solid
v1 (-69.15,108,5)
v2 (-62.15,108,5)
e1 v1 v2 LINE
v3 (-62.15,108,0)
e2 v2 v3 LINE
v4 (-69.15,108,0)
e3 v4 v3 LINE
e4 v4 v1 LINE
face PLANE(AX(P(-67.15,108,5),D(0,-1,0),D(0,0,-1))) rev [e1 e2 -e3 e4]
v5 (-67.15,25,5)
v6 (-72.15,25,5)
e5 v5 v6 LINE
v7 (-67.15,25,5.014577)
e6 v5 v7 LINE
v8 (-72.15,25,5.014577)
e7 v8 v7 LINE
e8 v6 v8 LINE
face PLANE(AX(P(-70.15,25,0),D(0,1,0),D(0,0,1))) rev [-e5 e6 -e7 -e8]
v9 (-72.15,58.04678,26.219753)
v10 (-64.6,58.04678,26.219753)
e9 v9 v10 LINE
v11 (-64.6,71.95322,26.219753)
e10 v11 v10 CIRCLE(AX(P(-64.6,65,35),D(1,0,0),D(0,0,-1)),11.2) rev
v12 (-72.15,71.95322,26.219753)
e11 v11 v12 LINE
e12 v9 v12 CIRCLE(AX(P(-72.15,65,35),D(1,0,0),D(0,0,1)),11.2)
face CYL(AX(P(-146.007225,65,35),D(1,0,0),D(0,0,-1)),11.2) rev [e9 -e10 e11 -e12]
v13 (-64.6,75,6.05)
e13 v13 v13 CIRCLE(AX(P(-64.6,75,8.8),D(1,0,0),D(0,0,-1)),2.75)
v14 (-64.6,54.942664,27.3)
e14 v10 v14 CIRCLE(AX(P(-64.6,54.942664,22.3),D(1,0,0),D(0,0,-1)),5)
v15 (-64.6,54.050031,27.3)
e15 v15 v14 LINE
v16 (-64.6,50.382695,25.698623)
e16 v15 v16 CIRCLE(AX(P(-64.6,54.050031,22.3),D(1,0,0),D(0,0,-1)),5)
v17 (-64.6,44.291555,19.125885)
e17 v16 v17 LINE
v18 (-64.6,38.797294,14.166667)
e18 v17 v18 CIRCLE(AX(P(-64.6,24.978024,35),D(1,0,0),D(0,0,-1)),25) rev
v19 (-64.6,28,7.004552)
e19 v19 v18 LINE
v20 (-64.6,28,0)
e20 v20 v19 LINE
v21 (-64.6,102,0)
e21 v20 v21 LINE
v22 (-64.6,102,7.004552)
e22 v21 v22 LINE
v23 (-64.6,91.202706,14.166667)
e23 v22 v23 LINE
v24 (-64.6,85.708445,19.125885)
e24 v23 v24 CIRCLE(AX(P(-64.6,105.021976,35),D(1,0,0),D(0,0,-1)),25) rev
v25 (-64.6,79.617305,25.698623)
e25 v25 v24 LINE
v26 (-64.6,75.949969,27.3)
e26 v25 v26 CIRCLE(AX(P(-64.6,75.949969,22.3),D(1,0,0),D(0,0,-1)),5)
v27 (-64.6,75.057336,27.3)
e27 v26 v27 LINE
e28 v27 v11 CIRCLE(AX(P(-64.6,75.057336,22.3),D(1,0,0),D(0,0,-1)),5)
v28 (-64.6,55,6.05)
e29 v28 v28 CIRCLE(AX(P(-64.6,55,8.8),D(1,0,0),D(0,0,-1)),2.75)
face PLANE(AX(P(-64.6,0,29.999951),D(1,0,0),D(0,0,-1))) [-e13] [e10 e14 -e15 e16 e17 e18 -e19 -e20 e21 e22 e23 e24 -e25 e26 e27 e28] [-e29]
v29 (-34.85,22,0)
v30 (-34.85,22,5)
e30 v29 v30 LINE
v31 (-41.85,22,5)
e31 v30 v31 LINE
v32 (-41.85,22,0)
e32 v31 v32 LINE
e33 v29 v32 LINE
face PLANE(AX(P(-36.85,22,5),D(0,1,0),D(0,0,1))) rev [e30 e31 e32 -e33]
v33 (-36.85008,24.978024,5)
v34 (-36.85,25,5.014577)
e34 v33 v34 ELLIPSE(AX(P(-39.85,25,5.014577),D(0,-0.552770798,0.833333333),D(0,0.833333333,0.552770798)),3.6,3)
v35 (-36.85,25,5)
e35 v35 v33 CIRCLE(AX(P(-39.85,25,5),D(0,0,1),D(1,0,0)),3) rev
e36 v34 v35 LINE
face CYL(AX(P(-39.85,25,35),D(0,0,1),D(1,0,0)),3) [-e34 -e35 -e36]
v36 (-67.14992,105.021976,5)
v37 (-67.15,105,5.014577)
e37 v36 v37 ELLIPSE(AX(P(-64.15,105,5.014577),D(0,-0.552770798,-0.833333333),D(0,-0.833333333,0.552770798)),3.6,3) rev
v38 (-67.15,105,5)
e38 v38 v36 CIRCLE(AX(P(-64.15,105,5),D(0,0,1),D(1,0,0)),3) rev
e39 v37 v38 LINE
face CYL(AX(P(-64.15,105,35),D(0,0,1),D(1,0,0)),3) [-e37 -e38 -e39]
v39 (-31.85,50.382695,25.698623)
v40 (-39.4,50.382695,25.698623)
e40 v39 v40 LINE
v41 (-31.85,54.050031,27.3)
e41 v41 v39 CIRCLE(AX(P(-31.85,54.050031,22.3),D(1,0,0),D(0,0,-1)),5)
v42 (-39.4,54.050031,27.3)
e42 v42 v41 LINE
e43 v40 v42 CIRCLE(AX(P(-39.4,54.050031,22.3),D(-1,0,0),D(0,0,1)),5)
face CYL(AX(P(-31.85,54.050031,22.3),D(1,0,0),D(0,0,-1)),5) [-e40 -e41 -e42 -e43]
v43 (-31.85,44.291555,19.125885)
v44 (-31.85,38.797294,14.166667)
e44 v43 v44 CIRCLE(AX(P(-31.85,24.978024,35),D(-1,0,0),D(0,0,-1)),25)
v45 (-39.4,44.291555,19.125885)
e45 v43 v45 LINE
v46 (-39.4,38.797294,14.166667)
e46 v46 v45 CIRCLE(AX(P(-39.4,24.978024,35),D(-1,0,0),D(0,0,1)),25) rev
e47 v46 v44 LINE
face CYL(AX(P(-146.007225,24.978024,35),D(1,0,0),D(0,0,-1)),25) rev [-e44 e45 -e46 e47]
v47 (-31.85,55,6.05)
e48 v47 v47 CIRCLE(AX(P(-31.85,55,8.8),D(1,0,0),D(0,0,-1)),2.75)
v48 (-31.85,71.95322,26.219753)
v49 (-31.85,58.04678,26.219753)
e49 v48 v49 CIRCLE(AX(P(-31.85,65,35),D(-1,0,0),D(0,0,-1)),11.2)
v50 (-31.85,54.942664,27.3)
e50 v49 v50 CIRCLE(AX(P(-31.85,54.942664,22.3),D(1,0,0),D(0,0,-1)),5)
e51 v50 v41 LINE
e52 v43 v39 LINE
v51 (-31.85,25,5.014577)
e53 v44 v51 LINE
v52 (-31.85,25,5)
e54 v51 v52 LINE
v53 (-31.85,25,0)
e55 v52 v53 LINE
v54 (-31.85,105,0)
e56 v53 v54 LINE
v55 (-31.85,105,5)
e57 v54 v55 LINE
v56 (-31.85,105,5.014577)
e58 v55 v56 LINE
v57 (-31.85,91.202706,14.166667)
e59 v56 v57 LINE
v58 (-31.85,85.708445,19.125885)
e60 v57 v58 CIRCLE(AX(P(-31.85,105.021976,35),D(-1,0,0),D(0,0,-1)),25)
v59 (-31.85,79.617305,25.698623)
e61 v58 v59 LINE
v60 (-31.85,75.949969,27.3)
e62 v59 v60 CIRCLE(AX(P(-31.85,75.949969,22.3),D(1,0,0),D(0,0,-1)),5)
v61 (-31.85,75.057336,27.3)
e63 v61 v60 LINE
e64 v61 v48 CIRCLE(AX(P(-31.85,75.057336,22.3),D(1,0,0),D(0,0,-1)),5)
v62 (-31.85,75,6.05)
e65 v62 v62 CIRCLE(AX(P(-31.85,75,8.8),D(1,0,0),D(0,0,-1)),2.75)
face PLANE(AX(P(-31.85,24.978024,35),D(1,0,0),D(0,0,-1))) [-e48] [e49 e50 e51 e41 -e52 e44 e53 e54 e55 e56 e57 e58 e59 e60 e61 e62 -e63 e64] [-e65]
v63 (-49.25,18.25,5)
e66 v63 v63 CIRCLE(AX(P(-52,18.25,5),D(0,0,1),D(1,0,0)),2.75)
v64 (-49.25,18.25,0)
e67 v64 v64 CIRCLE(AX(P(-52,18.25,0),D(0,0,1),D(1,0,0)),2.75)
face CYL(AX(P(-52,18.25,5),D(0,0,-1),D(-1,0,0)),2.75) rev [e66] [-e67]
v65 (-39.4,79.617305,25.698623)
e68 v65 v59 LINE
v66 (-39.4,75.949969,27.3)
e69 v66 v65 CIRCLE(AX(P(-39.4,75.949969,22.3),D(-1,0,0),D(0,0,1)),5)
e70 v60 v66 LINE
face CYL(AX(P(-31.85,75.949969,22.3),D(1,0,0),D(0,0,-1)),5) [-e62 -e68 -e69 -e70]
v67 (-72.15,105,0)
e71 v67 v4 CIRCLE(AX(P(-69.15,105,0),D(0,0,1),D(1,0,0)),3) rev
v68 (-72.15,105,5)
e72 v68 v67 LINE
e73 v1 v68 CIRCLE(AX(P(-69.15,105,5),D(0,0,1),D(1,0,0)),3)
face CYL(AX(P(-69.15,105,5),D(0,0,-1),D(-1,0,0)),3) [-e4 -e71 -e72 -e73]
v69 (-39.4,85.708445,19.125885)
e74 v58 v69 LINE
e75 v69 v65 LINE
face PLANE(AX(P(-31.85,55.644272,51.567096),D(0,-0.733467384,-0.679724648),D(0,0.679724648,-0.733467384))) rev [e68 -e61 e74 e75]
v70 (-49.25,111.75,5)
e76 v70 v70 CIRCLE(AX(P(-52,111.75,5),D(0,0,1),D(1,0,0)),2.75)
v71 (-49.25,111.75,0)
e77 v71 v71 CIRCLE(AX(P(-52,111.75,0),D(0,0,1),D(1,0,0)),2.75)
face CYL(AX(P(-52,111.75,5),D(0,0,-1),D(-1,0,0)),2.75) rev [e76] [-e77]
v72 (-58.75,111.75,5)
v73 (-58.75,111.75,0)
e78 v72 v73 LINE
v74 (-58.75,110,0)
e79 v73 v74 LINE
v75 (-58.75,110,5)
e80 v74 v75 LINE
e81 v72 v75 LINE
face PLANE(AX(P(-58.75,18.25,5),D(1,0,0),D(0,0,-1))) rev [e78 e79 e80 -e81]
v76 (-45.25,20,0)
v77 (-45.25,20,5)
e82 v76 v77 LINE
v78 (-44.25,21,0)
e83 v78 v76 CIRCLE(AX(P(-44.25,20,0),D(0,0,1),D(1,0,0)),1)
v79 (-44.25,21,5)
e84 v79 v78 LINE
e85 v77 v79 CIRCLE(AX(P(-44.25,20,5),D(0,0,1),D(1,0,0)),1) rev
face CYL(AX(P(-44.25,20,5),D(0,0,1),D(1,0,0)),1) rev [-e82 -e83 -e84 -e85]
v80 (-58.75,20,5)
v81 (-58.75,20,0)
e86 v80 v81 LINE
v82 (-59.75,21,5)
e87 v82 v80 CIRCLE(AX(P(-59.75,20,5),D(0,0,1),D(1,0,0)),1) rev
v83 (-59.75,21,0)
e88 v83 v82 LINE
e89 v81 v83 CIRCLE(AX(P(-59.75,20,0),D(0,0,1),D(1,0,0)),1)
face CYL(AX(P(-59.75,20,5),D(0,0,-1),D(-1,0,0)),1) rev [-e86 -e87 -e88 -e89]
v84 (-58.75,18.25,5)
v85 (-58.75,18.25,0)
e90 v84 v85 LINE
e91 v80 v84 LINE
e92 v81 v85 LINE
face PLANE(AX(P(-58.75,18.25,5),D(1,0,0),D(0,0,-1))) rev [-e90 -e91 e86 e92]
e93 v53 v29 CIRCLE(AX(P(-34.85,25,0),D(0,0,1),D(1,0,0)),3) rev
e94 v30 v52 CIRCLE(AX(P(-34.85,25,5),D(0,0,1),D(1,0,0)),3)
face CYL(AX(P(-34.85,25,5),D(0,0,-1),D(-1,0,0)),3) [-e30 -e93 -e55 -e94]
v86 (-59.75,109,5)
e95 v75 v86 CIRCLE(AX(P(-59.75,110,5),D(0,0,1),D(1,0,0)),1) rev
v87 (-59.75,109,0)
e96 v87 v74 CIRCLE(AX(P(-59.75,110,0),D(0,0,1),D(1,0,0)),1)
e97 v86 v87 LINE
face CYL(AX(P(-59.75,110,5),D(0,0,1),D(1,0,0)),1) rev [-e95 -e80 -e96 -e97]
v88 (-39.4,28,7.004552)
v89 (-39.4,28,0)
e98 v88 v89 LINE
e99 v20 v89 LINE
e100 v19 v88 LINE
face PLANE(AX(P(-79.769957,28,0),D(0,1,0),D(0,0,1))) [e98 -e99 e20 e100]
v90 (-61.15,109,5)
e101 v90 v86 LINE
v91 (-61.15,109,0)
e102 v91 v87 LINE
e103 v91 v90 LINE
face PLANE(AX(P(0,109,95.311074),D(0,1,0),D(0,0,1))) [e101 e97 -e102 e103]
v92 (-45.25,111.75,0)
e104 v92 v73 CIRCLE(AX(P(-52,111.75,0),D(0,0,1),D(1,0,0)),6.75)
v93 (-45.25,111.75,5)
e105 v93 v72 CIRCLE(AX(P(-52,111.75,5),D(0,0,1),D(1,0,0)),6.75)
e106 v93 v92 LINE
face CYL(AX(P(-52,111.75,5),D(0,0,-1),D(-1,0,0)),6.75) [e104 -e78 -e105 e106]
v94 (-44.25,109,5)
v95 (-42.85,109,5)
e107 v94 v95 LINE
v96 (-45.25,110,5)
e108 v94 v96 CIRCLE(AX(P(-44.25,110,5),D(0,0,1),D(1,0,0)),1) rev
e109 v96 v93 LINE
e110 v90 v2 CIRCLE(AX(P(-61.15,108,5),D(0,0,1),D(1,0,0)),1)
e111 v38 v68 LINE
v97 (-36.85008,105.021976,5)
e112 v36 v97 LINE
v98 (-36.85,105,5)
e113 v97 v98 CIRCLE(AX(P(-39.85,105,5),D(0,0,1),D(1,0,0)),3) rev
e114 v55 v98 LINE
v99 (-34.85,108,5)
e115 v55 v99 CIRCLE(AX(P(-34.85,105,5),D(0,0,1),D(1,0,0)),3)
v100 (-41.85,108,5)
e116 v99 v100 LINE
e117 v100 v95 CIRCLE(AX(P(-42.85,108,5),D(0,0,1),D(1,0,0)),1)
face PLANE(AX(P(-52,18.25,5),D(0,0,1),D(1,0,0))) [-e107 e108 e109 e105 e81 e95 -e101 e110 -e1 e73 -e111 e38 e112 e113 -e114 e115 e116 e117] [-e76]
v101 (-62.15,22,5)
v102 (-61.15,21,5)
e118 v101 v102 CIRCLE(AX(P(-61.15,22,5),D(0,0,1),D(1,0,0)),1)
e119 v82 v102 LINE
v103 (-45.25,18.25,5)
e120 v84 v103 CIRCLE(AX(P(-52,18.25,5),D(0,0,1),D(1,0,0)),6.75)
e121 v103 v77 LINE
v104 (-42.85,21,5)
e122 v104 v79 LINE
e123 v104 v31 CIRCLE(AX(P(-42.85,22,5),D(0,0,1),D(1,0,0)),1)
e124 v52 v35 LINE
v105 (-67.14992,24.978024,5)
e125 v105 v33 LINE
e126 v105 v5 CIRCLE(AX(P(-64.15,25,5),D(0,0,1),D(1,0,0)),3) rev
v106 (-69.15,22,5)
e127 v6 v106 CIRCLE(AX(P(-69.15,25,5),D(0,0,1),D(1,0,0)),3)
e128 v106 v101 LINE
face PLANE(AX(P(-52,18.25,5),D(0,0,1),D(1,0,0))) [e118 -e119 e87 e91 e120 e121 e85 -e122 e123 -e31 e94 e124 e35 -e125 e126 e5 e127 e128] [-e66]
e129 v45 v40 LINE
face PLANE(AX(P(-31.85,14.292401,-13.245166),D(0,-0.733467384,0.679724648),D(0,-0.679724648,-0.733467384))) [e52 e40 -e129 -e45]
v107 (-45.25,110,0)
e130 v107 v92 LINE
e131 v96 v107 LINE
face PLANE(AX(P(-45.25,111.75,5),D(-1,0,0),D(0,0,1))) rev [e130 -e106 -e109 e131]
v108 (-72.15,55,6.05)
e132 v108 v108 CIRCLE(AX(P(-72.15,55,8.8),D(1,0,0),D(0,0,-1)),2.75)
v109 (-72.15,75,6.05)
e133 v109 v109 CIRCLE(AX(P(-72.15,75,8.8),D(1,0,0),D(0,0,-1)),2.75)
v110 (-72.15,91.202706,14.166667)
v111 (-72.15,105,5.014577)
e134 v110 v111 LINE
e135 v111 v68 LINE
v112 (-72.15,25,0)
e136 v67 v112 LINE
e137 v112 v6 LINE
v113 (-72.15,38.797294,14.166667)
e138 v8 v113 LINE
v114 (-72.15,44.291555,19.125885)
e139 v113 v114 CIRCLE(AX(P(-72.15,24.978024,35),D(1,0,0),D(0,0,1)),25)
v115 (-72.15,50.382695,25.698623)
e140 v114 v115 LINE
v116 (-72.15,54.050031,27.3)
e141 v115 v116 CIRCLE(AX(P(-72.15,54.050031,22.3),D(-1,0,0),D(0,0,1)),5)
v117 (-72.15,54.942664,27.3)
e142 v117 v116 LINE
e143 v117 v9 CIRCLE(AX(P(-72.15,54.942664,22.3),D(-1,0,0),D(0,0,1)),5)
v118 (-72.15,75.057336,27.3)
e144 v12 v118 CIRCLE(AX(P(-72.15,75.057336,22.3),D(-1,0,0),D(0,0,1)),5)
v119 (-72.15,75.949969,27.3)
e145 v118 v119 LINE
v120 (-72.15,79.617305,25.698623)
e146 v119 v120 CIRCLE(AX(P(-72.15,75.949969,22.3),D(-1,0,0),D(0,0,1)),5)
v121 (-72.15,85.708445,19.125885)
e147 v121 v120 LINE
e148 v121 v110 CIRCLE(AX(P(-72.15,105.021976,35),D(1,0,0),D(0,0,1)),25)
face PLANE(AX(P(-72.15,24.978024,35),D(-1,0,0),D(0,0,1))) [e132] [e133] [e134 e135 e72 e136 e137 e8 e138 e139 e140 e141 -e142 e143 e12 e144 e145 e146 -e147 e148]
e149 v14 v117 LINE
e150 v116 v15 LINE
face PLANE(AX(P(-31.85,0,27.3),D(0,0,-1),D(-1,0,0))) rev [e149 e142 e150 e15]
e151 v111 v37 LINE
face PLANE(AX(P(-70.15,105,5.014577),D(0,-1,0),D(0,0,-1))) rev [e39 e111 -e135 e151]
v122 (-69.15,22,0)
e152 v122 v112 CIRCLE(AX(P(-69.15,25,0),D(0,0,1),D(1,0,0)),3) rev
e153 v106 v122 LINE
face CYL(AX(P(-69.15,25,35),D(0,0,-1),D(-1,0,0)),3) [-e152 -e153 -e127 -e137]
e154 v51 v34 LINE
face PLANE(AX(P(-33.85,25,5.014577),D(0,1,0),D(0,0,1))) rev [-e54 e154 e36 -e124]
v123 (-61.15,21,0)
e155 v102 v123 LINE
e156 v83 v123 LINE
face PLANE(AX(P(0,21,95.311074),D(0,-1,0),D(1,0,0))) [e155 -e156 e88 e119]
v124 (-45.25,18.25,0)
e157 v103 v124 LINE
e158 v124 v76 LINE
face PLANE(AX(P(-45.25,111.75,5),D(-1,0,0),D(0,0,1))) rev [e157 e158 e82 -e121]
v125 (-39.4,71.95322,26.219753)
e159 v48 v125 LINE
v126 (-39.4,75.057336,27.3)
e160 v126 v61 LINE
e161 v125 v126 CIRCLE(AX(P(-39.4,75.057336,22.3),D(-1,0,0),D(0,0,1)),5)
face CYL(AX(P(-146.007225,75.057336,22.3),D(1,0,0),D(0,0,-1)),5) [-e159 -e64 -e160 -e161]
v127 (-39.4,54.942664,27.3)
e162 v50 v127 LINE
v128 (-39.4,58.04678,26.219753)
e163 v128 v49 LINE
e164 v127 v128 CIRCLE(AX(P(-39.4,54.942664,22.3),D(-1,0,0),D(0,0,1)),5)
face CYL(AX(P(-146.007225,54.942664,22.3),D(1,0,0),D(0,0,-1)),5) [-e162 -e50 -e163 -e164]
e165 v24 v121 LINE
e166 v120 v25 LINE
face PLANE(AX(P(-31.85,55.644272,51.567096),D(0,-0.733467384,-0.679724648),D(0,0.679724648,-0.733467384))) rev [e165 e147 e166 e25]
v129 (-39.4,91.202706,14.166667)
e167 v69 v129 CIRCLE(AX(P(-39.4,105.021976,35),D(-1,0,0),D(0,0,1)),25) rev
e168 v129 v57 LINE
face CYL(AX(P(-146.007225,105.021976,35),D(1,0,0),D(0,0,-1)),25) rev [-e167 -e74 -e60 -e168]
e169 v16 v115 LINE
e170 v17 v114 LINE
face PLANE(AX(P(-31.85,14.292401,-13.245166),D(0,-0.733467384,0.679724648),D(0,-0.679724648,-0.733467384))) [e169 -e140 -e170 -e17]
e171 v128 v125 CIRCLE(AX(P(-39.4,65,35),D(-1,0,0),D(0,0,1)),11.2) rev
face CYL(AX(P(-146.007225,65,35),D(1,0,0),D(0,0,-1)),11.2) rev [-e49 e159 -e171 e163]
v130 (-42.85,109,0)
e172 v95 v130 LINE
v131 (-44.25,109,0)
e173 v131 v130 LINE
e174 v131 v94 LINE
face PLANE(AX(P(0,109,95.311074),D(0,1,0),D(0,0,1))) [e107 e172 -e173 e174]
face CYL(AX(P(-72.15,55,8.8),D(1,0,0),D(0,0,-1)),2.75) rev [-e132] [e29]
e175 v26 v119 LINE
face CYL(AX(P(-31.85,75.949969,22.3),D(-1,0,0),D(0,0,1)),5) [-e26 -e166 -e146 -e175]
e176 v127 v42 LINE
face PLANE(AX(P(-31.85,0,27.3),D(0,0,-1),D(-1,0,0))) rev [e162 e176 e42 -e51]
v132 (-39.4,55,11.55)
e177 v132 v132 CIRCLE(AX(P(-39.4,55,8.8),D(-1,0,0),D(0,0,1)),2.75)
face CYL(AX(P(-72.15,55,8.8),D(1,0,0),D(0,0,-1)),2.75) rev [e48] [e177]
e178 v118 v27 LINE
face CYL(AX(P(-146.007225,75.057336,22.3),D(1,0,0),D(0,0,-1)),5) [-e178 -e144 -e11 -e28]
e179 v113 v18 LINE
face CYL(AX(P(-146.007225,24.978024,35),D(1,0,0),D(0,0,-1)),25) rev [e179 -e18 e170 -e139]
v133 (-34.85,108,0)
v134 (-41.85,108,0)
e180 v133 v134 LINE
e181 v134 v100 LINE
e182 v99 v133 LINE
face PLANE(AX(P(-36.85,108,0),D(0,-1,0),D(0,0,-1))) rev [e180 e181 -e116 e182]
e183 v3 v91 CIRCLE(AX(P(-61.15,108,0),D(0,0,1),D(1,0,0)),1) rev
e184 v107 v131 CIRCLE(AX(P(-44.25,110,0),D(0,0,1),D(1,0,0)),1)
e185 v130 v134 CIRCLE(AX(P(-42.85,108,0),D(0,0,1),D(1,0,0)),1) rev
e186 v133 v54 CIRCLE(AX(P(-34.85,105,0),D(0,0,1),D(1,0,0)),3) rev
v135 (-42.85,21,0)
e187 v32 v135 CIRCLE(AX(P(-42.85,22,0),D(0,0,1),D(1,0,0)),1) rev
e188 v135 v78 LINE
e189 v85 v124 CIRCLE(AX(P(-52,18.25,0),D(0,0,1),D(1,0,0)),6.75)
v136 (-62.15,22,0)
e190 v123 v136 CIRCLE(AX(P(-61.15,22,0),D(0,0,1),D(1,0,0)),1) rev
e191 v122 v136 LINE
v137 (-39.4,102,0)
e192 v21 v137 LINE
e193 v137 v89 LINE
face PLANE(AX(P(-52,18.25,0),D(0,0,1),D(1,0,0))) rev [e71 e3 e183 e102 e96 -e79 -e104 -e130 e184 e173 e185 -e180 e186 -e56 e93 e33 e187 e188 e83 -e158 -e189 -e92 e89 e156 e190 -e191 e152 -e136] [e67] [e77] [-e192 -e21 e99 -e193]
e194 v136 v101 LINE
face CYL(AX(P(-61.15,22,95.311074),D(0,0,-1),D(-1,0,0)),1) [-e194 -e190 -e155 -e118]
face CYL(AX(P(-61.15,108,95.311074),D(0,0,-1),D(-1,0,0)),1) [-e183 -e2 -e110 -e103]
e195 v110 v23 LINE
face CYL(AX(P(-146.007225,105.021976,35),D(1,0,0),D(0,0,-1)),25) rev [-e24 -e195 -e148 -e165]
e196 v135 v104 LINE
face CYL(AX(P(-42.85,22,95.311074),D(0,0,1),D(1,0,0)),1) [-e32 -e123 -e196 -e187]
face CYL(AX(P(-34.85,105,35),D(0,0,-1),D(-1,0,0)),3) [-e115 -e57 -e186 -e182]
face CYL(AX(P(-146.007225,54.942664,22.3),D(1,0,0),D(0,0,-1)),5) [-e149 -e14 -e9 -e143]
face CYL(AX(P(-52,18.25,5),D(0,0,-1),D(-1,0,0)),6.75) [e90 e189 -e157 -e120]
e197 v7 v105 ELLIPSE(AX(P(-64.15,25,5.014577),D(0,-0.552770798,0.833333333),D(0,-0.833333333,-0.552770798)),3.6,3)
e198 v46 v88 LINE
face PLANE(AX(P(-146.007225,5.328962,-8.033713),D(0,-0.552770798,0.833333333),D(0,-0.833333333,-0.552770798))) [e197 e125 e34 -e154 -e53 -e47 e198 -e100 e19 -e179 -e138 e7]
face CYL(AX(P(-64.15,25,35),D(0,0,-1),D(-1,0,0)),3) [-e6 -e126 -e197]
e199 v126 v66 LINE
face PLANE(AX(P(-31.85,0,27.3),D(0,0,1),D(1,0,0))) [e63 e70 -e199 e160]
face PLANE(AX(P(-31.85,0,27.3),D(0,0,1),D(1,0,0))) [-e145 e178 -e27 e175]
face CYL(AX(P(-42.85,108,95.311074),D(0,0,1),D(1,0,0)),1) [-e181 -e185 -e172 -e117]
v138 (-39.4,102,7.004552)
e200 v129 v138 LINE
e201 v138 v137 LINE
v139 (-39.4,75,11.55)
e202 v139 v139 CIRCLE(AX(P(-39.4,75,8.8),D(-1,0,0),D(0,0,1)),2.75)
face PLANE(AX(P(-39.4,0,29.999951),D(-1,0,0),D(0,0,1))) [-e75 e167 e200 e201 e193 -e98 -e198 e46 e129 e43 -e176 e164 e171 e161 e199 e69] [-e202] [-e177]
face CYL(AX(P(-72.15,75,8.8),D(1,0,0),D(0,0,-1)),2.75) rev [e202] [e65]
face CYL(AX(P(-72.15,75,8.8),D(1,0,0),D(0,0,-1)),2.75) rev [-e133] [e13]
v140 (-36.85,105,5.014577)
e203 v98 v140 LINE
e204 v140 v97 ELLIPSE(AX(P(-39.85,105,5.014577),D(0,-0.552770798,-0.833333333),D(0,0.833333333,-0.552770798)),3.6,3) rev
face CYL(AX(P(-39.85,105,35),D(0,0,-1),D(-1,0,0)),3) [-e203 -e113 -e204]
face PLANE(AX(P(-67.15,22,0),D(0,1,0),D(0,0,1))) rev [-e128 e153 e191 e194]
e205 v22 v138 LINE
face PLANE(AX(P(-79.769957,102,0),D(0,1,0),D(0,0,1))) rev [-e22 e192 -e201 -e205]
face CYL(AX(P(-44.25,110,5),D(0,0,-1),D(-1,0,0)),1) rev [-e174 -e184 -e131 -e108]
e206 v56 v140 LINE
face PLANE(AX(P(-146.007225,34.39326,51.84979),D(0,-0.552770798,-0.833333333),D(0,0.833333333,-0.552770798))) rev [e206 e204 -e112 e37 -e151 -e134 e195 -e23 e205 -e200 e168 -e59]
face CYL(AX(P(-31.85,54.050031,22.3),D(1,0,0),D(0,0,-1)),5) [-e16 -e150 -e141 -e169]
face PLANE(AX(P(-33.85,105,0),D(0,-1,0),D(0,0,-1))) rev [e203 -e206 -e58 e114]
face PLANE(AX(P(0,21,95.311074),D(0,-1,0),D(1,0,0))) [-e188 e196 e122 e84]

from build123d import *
from build123d.topology import SkipClean

# Parameters (mm, degrees)
SKETCH2_R               = 2.75
SKETCH2_W               = 8.45
SKETCH2_H               = 80
BOSS_EXTRUDE1_DEPTH     = 5
SKETCH4_W               = 3.4
SKETCH4_H               = 88
BOSS_EXTRUDE2_DEPTH     = 5
BOSS_EXTRUDE3_DEPTH     = 20.3
FILLET3_R               = 4.2
SKETCH7_W               = 8.45
SKETCH7_H               = 80
CUT_EXTRUDE1_DEPTH      = 38
FILLET4_R               = 3
FILLET5_R               = 1
BOSS_EXTRUDE4_START     = 5
BOSS_EXTRUDE4_DEPTH     = 5
BOSS_EXTRUDE5_DEPTH     = 5
CUT_EXTRUDE2_START      = -5
CUT_EXTRUDE2_DEPTH      = 5
CUT_EXTRUDE3_DEPTH      = 5
FILLET6_R               = 3
CUT_EXTRUDE4_DEPTH      = 140.468166751
CUT_EXTRUDE4_DEPTH_BACK = 140.468166751
BOSS_EXTRUDE6_START     = 3
BOSS_EXTRUDE6_DEPTH     = 3
BOSS_EXTRUDE7_DEPTH     = 3
BOSS_EXTRUDE8_DEPTH     = 2
BOSS_EXTRUDE9_START     = 2
BOSS_EXTRUDE9_DEPTH     = 2
BOSS_EXTRUDE10_DEPTH    = 5
FILLET8_R               = 3
CUT_EXTRUDE5_DEPTH      = 129.710283337
CUT_EXTRUDE5_DEPTH_BACK = 129.710283337
SKETCH21_R              = 2.75
BOSS_EXTRUDE11_DEPTH    = 40.3
CUT_EXTRUDE6_DEPTH      = 129.710283337
CUT_EXTRUDE6_DEPTH_BACK = 129.710283337
CUT_EXTRUDE7_DEPTH      = 129.107884223
CUT_EXTRUDE7_DEPTH_BACK = 129.107884223
FILLET9_R               = 5


with BuildPart() as part:
    # Sketch2 → Boss-Extrude1 (new body)
    with BuildSketch(Plane.XY):
        with BuildLine():
            Line((-58.75, 18.25), (-58.75, 111.75))
            ThreePointArc((-58.75, 111.75), (-52, 118.5), (-45.25, 111.75))
            Line((-45.25, 111.75), (-45.25, 18.25))
            ThreePointArc((-45.25, 18.25), (-52, 11.5), (-58.75, 18.25))
        make_face()
        with Locations((-52, 18.25)):
            Circle(SKETCH2_R, mode=Mode.SUBTRACT)
        with Locations((-52, 111.75)):
            Circle(SKETCH2_R, mode=Mode.SUBTRACT)
        with Locations((-52, 65)):
            Rectangle(SKETCH2_W, SKETCH2_H, mode=Mode.SUBTRACT)
    extrude(amount=BOSS_EXTRUDE1_DEPTH)

    # Sketch4 → Boss-Extrude2 (add)
    with BuildSketch(Plane.XY):
        with Locations((-60.45, 65)):
            Rectangle(SKETCH4_W, SKETCH4_H)
        with Locations((-43.55, 65)):
            Rectangle(SKETCH4_W, SKETCH4_H)
    extrude(amount=BOSS_EXTRUDE2_DEPTH)

    # Sketch5 → Boss-Extrude3 (add)
    with BuildSketch(Plane(origin=(-41.85, 0, 0), x_dir=(0, 0, -1), z_dir=(1, 0, 0))):
        with BuildLine():
            Line((-14.166666667, 38.797294107), (-5, 24.978024147))
            Line((-5, 24.978024147), (-5, 105.021975853))
            Line((-5, 105.021975853), (-14.166666667, 91.202705893))
            ThreePointArc((-14.166666667, 91.202705893), (-21.023858428, 84.293554139), (-30, 80.527078425))
            Line((-30, 80.527078425), (-30, 75.021975853))
            ThreePointArc((-30, 75.021975853), (-23.8, 65), (-30, 54.978024147))
            Line((-30, 54.978024147), (-30, 49.472921575))
            ThreePointArc((-30, 49.472921575), (-21.023858428, 45.706445861), (-14.166666667, 38.797294107))
        make_face()
    extrude(amount=-BOSS_EXTRUDE3_DEPTH)

    # Fillet3
    # the kernel refuses this fillet: 4.2 mm, written as the material it takes off along each edge
    with BuildSketch(Plane(origin=(-33.805211267, 80.527078425, 30), x_dir=(0, 0.2579921020094514, -0.9661470257164511), z_dir=(-1, 0, 0))) as fillet3_piece_1:
        with BuildLine():
            CenterArc((3.227620726, 4.192546311), FILLET3_R, 194.950953872, 71.635051289)
            Line((-0.830196782, 3.108979483), (0, 0))
            ThreePointArc((0, 0), (1.488754947, 0.044367195), (2.977509895, 0))
        make_face()
    extrude(amount=36.389577466, mode=Mode.SUBTRACT)
    with BuildSketch(Plane(origin=(-36.03019267, 54.978024147, 30), x_dir=(0, 0.5239775265852198, -0.8517320891181893), z_dir=(-1, 0, 0))) as fillet3_piece_2:
        with BuildLine():
            CenterArc((2.357495474, 4.183472274), FILLET3_R, 211.599436319, 53.315901995)
            Line((-1.2197793, 1.982766662), (0, 0))
            ThreePointArc((0, 0), (0.992629673, 0.044073937), (1.985259347, 0))
        make_face()
    extrude(amount=31.93961466, mode=Mode.SUBTRACT)
    with BuildSketch(Plane(origin=(-36.03019267, 75.021975853, 30), x_dir=(0, 1, 0), z_dir=(-1, 0, 0))) as fillet3_piece_3:
        with BuildLine():
            CenterArc((2.327922932, 4.2), FILLET3_R, 216.684098005, 53.315901995)
            ThreePointArc((-1.040231282, 1.690909091), (-0.482576455, 0.868548298), (0, 0))
            Line((0, 0), (2.327922932, 0))
        make_face()
    extrude(amount=31.93961466, mode=Mode.SUBTRACT)
    with BuildSketch(Plane(origin=(-33.805211267, 49.472921575, 30), x_dir=(0, -0.25799210200945616, -0.96614702571645), z_dir=(-1, 0, 0))) as fillet3_piece_4:
        with BuildLine():
            CenterArc((3.227620726, -4.192546311), FILLET3_R, 93.413994839, 71.635051289)
            Line((-0.830196782, -3.108979483), (0, 0))
            ThreePointArc((0, 0), (1.488754947, -0.044367195), (2.977509895, 0))
        make_face()
    extrude(amount=36.389577466, mode=Mode.SUBTRACT)

    # Sketch7 → Cut-Extrude1 (cut)
    with BuildSketch(Plane(origin=(0, 0, 5), x_dir=(-1, 0, 0), z_dir=(0, 0, -1))):
        with Locations((52, 65)):
            Rectangle(SKETCH7_W, SKETCH7_H)
    extrude(amount=-CUT_EXTRUDE1_DEPTH, mode=Mode.SUBTRACT)

    # Fillet4
    fillet4_edges = [part.edges().sort_by_distance(p)[0] for p in [
        (-56.225, 105, 2.507288566),
        (-56.225, 25, 2.507288566),
        (-47.775, 25, 2.507288566),
        (-47.775, 105, 2.507288566),
    ]]
    fillet(fillet4_edges, radius=FILLET4_R)

    # Fillet5
    fillet5_edges = [part.edges().sort_by_distance(p)[0] for p in [
        (-62.15, 21, 2.5),
        (-58.75, 21, 2.5),
        (-41.85, 109, 2.5),
        (-45.25, 109, 2.5),
        (-62.15, 109, 2.5),
        (-45.25, 21, 2.5),
        (-41.85, 21, 2.5),
        (-58.75, 109, 2.5),
    ]]
    fillet(fillet5_edges, radius=FILLET5_R)

    # Sketch8 → Boss-Extrude4 (add)
    with SkipClean():  # the faces are left unmerged after this step: merging them gives an invalid solid
        with BuildSketch(Plane(origin=(-41.85, 0, 0), x_dir=(0, 0, -1), z_dir=(1, 0, 0)).offset(BOSS_EXTRUDE4_START)):
            with BuildLine():
                Line((0, 22), (0, 108))
                Line((0, 108), (-5, 108))
                Line((-5, 108), (-5, 105.021975853))
                Line((-5, 105.021975853), (-14.166666667, 91.202705893))
                ThreePointArc((-14.166666667, 91.202705893), (-19.814280101, 85.162622612), (-27.123287671, 81.295252462))
                ThreePointArc((-27.123287671, 81.295252462), (-29.199746644, 79.775277843), (-29.999950613, 77.329530859))
                ThreePointArc((-29.999950613, 77.329530859), (-29.548963562, 75.45641728), (-28.309090909, 73.981744571))
                ThreePointArc((-28.309090909, 73.981744571), (-23.8, 65), (-28.309090909, 56.018255429))
                ThreePointArc((-28.309090909, 56.018255429), (-29.548963562, 54.54358272), (-29.999950613, 52.670469141))
                ThreePointArc((-29.999950613, 52.670469141), (-29.199746644, 50.224722157), (-27.123287671, 48.704747538))
                ThreePointArc((-27.123287671, 48.704747538), (-19.814280101, 44.837377388), (-14.166666667, 38.797294107))
                Line((-14.166666667, 38.797294107), (-5, 24.978024147))
                Line((-5, 24.978024147), (-5, 22))
                Line((-5, 22), (0, 22))
            make_face()
        extrude(amount=-BOSS_EXTRUDE4_DEPTH)

    # Sketch9 → Boss-Extrude5 (add)
    with SkipClean():  # the faces are left unmerged after this step: merging them gives an invalid solid
        with BuildSketch(Plane.ZY.offset(62.15)):
            with BuildLine():
                Line((5, 105.021975853), (5, 108))
                Line((5, 108), (0, 108))
                Line((0, 108), (0, 22))
                Line((0, 22), (5, 22))
                Line((5, 22), (5, 24.978024147))
                Line((5, 24.978024147), (14.166666667, 38.797294107))
                ThreePointArc((14.166666667, 38.797294107), (19.814280101, 44.837377388), (27.123287671, 48.704747538))
                ThreePointArc((27.123287671, 48.704747538), (29.199746644, 50.224722157), (29.999950613, 52.670469141))
                ThreePointArc((29.999950613, 52.670469141), (29.548963562, 54.54358272), (28.309090909, 56.018255429))
                ThreePointArc((28.309090909, 56.018255429), (23.8, 65), (28.309090909, 73.981744571))
                ThreePointArc((28.309090909, 73.981744571), (29.548963562, 75.45641728), (29.999950613, 77.329530859))
                ThreePointArc((29.999950613, 77.329530859), (29.199746644, 79.775277843), (27.123287671, 81.295252462))
                ThreePointArc((27.123287671, 81.295252462), (19.814280101, 85.162622612), (14.166666667, 91.202705893))
                Line((14.166666667, 91.202705893), (5, 105.021975853))
            make_face()
        extrude(amount=BOSS_EXTRUDE5_DEPTH)

    # Sketch10 → Cut-Extrude2 (cut)
    with SkipClean():  # the faces are left unmerged after this step: merging them gives an invalid solid
        with BuildSketch(Plane.ZY.offset(47.775).offset(CUT_EXTRUDE2_START)):
            with BuildLine():
                Line((14.166666667, 91.202705893), (7.004552006, 102))
                Line((7.004552006, 102), (0, 102))
                Line((0, 102), (0, 28))
                Line((0, 28), (7.004552006, 28))
                Line((7.004552006, 28), (14.166666667, 38.797294107))
                ThreePointArc((14.166666667, 38.797294107), (19.814280101, 44.837377388), (27.123287671, 48.704747538))
                ThreePointArc((27.123287671, 48.704747538), (29.199746644, 50.224722157), (29.999950613, 52.670469141))
                ThreePointArc((29.999950613, 52.670469141), (29.548963562, 54.54358272), (28.309090909, 56.018255429))
                ThreePointArc((28.309090909, 56.018255429), (23.8, 65), (28.309090909, 73.981744571))
                ThreePointArc((28.309090909, 73.981744571), (29.548963562, 75.45641728), (29.999950613, 77.329530859))
                ThreePointArc((29.999950613, 77.329530859), (29.199746644, 79.775277843), (27.123287671, 81.295252462))
                ThreePointArc((27.123287671, 81.295252462), (19.814280101, 85.162622612), (14.166666667, 91.202705893))
            make_face()
        extrude(amount=CUT_EXTRUDE2_DEPTH, mode=Mode.SUBTRACT)

    # Sketch11 → Cut-Extrude3 (cut)
    with SkipClean():  # the faces are left unmerged after this step: merging them gives an invalid solid
        with BuildSketch(Plane(origin=(-56.225, 0, 0), x_dir=(0, 0, -1), z_dir=(1, 0, 0))):
            with BuildLine():
                Line((0, 28), (0, 102))
                Line((0, 102), (-7.004552006, 102))
                Line((-7.004552006, 102), (-14.166666667, 91.202705893))
                ThreePointArc((-14.166666667, 91.202705893), (-19.814280101, 85.162622612), (-27.123287671, 81.295252462))
                ThreePointArc((-27.123287671, 81.295252462), (-29.199746644, 79.775277843), (-29.999950613, 77.329530859))
                ThreePointArc((-29.999950613, 77.329530859), (-29.548963562, 75.45641728), (-28.309090909, 73.981744571))
                ThreePointArc((-28.309090909, 73.981744571), (-23.8, 65), (-28.309090909, 56.018255429))
                ThreePointArc((-28.309090909, 56.018255429), (-29.548963562, 54.54358272), (-29.999950613, 52.670469141))
                ThreePointArc((-29.999950613, 52.670469141), (-29.199746644, 50.224722157), (-27.123287671, 48.704747538))
                ThreePointArc((-27.123287671, 48.704747538), (-19.814280101, 44.837377388), (-14.166666667, 38.797294107))
                Line((-14.166666667, 38.797294107), (-7.004552006, 28))
                Line((-7.004552006, 28), (0, 28))
            make_face()
        extrude(amount=-CUT_EXTRUDE3_DEPTH, mode=Mode.SUBTRACT)

    # Fillet6
    fillet6_edges = [part.edges().sort_by_distance(p)[0] for p in [
        (-67.15, 22, 2.5),
        (-36.85, 22, 2.5),
        (-36.85, 108, 2.5),
        (-67.15, 108, 2.5),
    ]]
    fillet(fillet6_edges, radius=FILLET6_R)

    # Sketch12 → Cut-Extrude4 (cut, two sides: drawn at the far end of the back side and taken through both)
    with BuildSketch(Plane(origin=(0, 0, 0), x_dir=(-1, 0, 0), z_dir=(0, 0, -1)).offset(-CUT_EXTRUDE4_DEPTH_BACK)):
        Polygon((42.775, 102), (42.775, 28), (47.775, 28), (56.225, 28), (61.225, 28), (61.225, 102), (56.225, 102), (47.775, 102), align=None)
        Polygon((61.225, 102), (61.225, 28), (64, 28), (64, 75), (64, 102), align=None)
        with BuildLine():
            Line((61.225, 28), (56.225, 28))
            ThreePointArc((56.225, 28), (56.209808459, 27.698473114), (56.164387691, 27.4))
            Line((56.164387691, 27.4), (61.225, 27.4))
            Line((61.225, 27.4), (64.6, 27.4))
            Line((64.6, 27.4), (64.6, 102))
            Line((64.6, 102), (64.6, 102.6))
            Line((64.6, 102.6), (64, 102.6))
            Line((64, 102.6), (56.164387691, 102.6))
            ThreePointArc((56.164387691, 102.6), (56.209808459, 102.301526886), (56.225, 102))
            Line((56.225, 102), (61.225, 102))
            Line((61.225, 102), (64, 102))
            Line((64, 102), (64, 75))
            Line((64, 75), (64, 28))
            Line((64, 28), (61.225, 28))
        make_face()
        with BuildLine():
            Line((56.225, 28), (47.775, 28))
            ThreePointArc((47.775, 28), (47.790191541, 27.698473114), (47.835612309, 27.4))
            Line((47.835612309, 27.4), (56.164387691, 27.4))
            ThreePointArc((56.164387691, 27.4), (56.209808459, 27.698473114), (56.225, 28))
        make_face()
        Polygon((40, 55), (40, 100.870302184), (40, 102), (42.775, 102), (42.775, 28), (40, 28), align=None)
        with BuildLine():
            Line((40, 28), (40, 55))
            Line((40, 55), (40, 100.870302184))
            Line((40, 100.870302184), (40, 102))
            Line((40, 102), (42.775, 102))
            Line((42.775, 102), (47.775, 102))
            ThreePointArc((47.775, 102), (47.790191541, 102.301526886), (47.835612309, 102.6))
            Line((47.835612309, 102.6), (40, 102.6))
            Line((40, 102.6), (39.4, 102.6))
            Line((39.4, 102.6), (39.4, 102))
            Line((39.4, 102), (39.4, 100.870302184))
            Line((39.4, 100.870302184), (39.4, 55))
            Line((39.4, 55), (39.4, 27.4))
            Line((39.4, 27.4), (42.775, 27.4))
            Line((42.775, 27.4), (47.835612309, 27.4))
            ThreePointArc((47.835612309, 27.4), (47.790191541, 27.698473114), (47.775, 28))
            Line((47.775, 28), (42.775, 28))
            Line((42.775, 28), (40, 28))
        make_face()
        with BuildLine():
            ThreePointArc((47.835612309, 102.6), (47.790191541, 102.301526886), (47.775, 102))
            Line((47.775, 102), (56.225, 102))
            ThreePointArc((56.225, 102), (56.209808459, 102.301526886), (56.164387691, 102.6))
            Line((56.164387691, 102.6), (47.835612309, 102.6))
        make_face()
    extrude(amount=CUT_EXTRUDE4_DEPTH + CUT_EXTRUDE4_DEPTH_BACK, mode=Mode.SUBTRACT)

    # Sketch14 → Boss-Extrude6 (add)
    with BuildSketch(Plane(origin=(-36.85, 0, 0), x_dir=(0, 0, -1), z_dir=(1, 0, 0)).offset(BOSS_EXTRUDE6_START)):
        with BuildLine():
            Line((-14.166666667, 38.797294107), (-5.014577132, 25))
            Line((-5.014577132, 25), (0, 25))
            Line((0, 25), (0, 105))
            Line((0, 105), (-5.014577132, 105))
            Line((-5.014577132, 105), (-14.166666667, 91.202705893))
            ThreePointArc((-14.166666667, 91.202705893), (-19.814280101, 85.162622612), (-27.123287671, 81.295252462))
            ThreePointArc((-27.123287671, 81.295252462), (-29.199746644, 79.775277843), (-29.999950613, 77.329530859))
            ThreePointArc((-29.999950613, 77.329530859), (-29.548963562, 75.45641728), (-28.309090909, 73.981744571))
            ThreePointArc((-28.309090909, 73.981744571), (-23.8, 65), (-28.309090909, 56.018255429))
            ThreePointArc((-28.309090909, 56.018255429), (-29.548963562, 54.54358272), (-29.999950613, 52.670469141))
            ThreePointArc((-29.999950613, 52.670469141), (-29.199746644, 50.224722157), (-27.123287671, 48.704747538))
            ThreePointArc((-27.123287671, 48.704747538), (-19.814280101, 44.837377388), (-14.166666667, 38.797294107))
        make_face()
    extrude(amount=-BOSS_EXTRUDE6_DEPTH)

    # Sketch15 → Boss-Extrude7 (add)
    with BuildSketch(Plane.ZY.offset(67.15)):
        with BuildLine():
            Line((0, 105), (0, 25))
            Line((0, 25), (5.014577132, 25))
            Line((5.014577132, 25), (14.166666667, 38.797294107))
            ThreePointArc((14.166666667, 38.797294107), (19.814280101, 44.837377388), (27.123287671, 48.704747538))
            ThreePointArc((27.123287671, 48.704747538), (29.199746644, 50.224722157), (29.999950613, 52.670469141))
            ThreePointArc((29.999950613, 52.670469141), (29.548963562, 54.54358272), (28.309090909, 56.018255429))
            ThreePointArc((28.309090909, 56.018255429), (23.8, 65), (28.309090909, 73.981744571))
            ThreePointArc((28.309090909, 73.981744571), (29.548963562, 75.45641728), (29.999950613, 77.329530859))
            ThreePointArc((29.999950613, 77.329530859), (29.199746644, 79.775277843), (27.123287671, 81.295252462))
            ThreePointArc((27.123287671, 81.295252462), (19.814280101, 85.162622612), (14.166666667, 91.202705893))
            Line((14.166666667, 91.202705893), (5.014577132, 105))
            Line((5.014577132, 105), (0, 105))
        make_face()
    extrude(amount=BOSS_EXTRUDE7_DEPTH)

    # Sketch17 → Boss-Extrude8 (add)
    with BuildSketch(Plane.ZY.offset(70.15)):
        with BuildLine():
            Line((5.014577132, 105), (0, 105))
            Line((0, 105), (0, 25))
            Line((0, 25), (5.014577132, 25))
            Line((5.014577132, 25), (14.166666667, 38.797294107))
            ThreePointArc((14.166666667, 38.797294107), (19.814280101, 44.837377388), (27.123287671, 48.704747538))
            ThreePointArc((27.123287671, 48.704747538), (29.199746644, 50.224722157), (29.999950613, 52.670469141))
            ThreePointArc((29.999950613, 52.670469141), (29.548963562, 54.54358272), (28.309090909, 56.018255429))
            ThreePointArc((28.309090909, 56.018255429), (23.8, 65), (28.309090909, 73.981744571))
            ThreePointArc((28.309090909, 73.981744571), (29.548963562, 75.45641728), (29.999950613, 77.329530859))
            ThreePointArc((29.999950613, 77.329530859), (29.199746644, 79.775277843), (27.123287671, 81.295252462))
            ThreePointArc((27.123287671, 81.295252462), (19.814280101, 85.162622612), (14.166666667, 91.202705893))
            Line((14.166666667, 91.202705893), (5.014577132, 105))
        make_face()
    extrude(amount=BOSS_EXTRUDE8_DEPTH)

    # Sketch18 → Boss-Extrude9 (add)
    with BuildSketch(Plane(origin=(-33.85, 0, 0), x_dir=(0, 0, -1), z_dir=(1, 0, 0)).offset(BOSS_EXTRUDE9_START)):
        with BuildLine():
            Line((-14.166666667, 38.797294107), (-5.014577132, 25))
            Line((-5.014577132, 25), (0, 25))
            Line((0, 25), (0, 105))
            Line((0, 105), (-5.014577132, 105))
            Line((-5.014577132, 105), (-14.166666667, 91.202705893))
            ThreePointArc((-14.166666667, 91.202705893), (-19.814280101, 85.162622612), (-27.123287671, 81.295252462))
            ThreePointArc((-27.123287671, 81.295252462), (-29.199746644, 79.775277843), (-29.999950613, 77.329530859))
            ThreePointArc((-29.999950613, 77.329530859), (-29.548963562, 75.45641728), (-28.309090909, 73.981744571))
            ThreePointArc((-28.309090909, 73.981744571), (-23.8, 65), (-28.309090909, 56.018255429))
            ThreePointArc((-28.309090909, 56.018255429), (-29.548963562, 54.54358272), (-29.999950613, 52.670469141))
            ThreePointArc((-29.999950613, 52.670469141), (-29.199746644, 50.224722157), (-27.123287671, 48.704747538))
            ThreePointArc((-27.123287671, 48.704747538), (-19.814280101, 44.837377388), (-14.166666667, 38.797294107))
        make_face()
    extrude(amount=-BOSS_EXTRUDE9_DEPTH)

    # Sketch20 → Boss-Extrude10 (add)
    with BuildSketch(Plane.XY.offset(5)):
        Polygon((-64.15, 108), (-39.85, 108), (-31.85, 108), (-31.85, 105), (-72.15, 105), (-72.15, 108), align=None)
        with BuildLine():
            Line((-31.85, 25), (-31.85, 22))
            Line((-31.85, 22), (-39.85, 22))
            ThreePointArc((-39.85, 22), (-37.736463575, 22.870924196), (-36.850080491, 24.978024147))
            Line((-36.850080491, 24.978024147), (-67.149919509, 24.978024147))
            ThreePointArc((-67.149919509, 24.978024147), (-66.263536425, 22.870924196), (-64.15, 22))
            Line((-64.15, 22), (-72.15, 22))
            Line((-72.15, 22), (-72.15, 25))
            Line((-72.15, 25), (-31.85, 25))
        make_face()
        with BuildLine():
            ThreePointArc((-67.149919509, 24.978024147), (-66.263536425, 22.870924196), (-64.15, 22))
            Line((-64.15, 22), (-62.15, 22))
            Line((-62.15, 22), (-41.85, 22))
            Line((-41.85, 22), (-39.85, 22))
            ThreePointArc((-39.85, 22), (-37.736463575, 22.870924196), (-36.850080491, 24.978024147))
            Line((-36.850080491, 24.978024147), (-67.149919509, 24.978024147))
        make_face()
    extrude(amount=-BOSS_EXTRUDE10_DEPTH)

    # Fillet8
    fillet8_edges = [part.edges().sort_by_distance(p)[0] for p in [
        (-31.85, 108, 2.5),
        (-72.15, 108, 2.5),
        (-31.85, 22, 2.5),
        (-72.15, 22, 2.5),
    ]]
    fillet(fillet8_edges, radius=FILLET8_R)

    # Sketch21 → Cut-Extrude5 (cut, two sides: drawn at the far end of the back side and taken through both)
    with BuildSketch(Plane(origin=(-31.85, 0, 0), x_dir=(0, 0, -1), z_dir=(1, 0, 0)).offset(-CUT_EXTRUDE5_DEPTH_BACK)):
        with Locations((-8.8, 55)):
            Circle(SKETCH21_R)
        with Locations((-8.8, 75)):
            Circle(SKETCH21_R)
    extrude(amount=CUT_EXTRUDE5_DEPTH + CUT_EXTRUDE5_DEPTH_BACK, mode=Mode.SUBTRACT)

    # Sketch24 → Boss-Extrude11 (add)
    with BuildSketch(Plane(origin=(-31.85, 0, 0), x_dir=(0, 0, -1), z_dir=(1, 0, 0))):
        Polygon((-7.004552006, 102), (0, 102), (0, 105), (-5, 105), (-5.014577132, 105), align=None)
        Polygon((-5, 25), (0, 25), (0, 28), (-7.004552006, 28), (-5.014577132, 25), align=None)
    extrude(amount=-BOSS_EXTRUDE11_DEPTH)

    # Sketch28 → Cut-Extrude6 (cut, two sides: drawn at the far end of the back side and taken through both)
    with BuildSketch(Plane.ZY.offset(72.15).offset(-CUT_EXTRUDE6_DEPTH_BACK)):
        with BuildLine():
            Line((27.3, 81.232171981), (27.3, 73.133265027))
            ThreePointArc((27.3, 73.133265027), (27.792049841, 73.572365747), (28.309090909, 73.981744571))
            ThreePointArc((28.309090909, 73.981744571), (29.548963562, 75.45641728), (29.999950613, 77.329530859))
            ThreePointArc((29.999950613, 77.329530859), (29.253984826, 79.698721222), (27.3, 81.232171981))
        make_face()
        with BuildLine():
            ThreePointArc((28.309090909, 56.018255429), (27.792049841, 56.427634253), (27.3, 56.866734973))
            Line((27.3, 56.866734973), (27.3, 48.767828019))
            ThreePointArc((27.3, 48.767828019), (29.253984826, 50.301278778), (29.999950613, 52.670469141))
            ThreePointArc((29.999950613, 52.670469141), (29.548963562, 54.54358272), (28.309090909, 56.018255429))
        make_face()
    extrude(amount=CUT_EXTRUDE6_DEPTH + CUT_EXTRUDE6_DEPTH_BACK, mode=Mode.SUBTRACT)

    # Sketch30 → Cut-Extrude7 (cut, two sides: drawn at the far end of the back side and taken through both)
    with BuildSketch(Plane.ZY.offset(72.15).offset(-CUT_EXTRUDE7_DEPTH_BACK)):
        with BuildLine():
            Line((19.125884799, 85.708445192), (27.3, 78.133265027))
            Line((27.3, 78.133265027), (27.3, 81.232171981))
            ThreePointArc((27.3, 81.232171981), (27.211996142, 81.264699166), (27.123287671, 81.295252462))
            ThreePointArc((27.123287671, 81.295252462), (22.921319625, 83.133497596), (19.125884799, 85.708445192))
        make_face()
        with BuildLine():
            Line((27.3, 48.767828019), (27.3, 51.866734973))
            Line((27.3, 51.866734973), (19.125884799, 44.291554808))
            ThreePointArc((19.125884799, 44.291554808), (22.921319625, 46.866502404), (27.123287671, 48.704747538))
            ThreePointArc((27.123287671, 48.704747538), (27.211996142, 48.735300834), (27.3, 48.767828019))
        make_face()
    extrude(amount=CUT_EXTRUDE7_DEPTH + CUT_EXTRUDE7_DEPTH_BACK, mode=Mode.SUBTRACT)

    # Fillet9
    fillet9_edges = [part.edges().sort_by_distance(p)[0] for p in [
        (-35.625, 73.133265027, 27.3),
        (-68.375, 73.133265027, 27.3),
        (-35.625, 56.866734973, 27.3),
        (-68.375, 56.866734973, 27.3),
        (-68.375, 78.133265027, 27.3),
        (-68.375, 51.866734973, 27.3),
        (-35.625, 78.133265027, 27.3),
        (-35.625, 51.866734973, 27.3),
    ]]
    fillet(fillet9_edges, radius=FILLET9_R)


solid = part.part
